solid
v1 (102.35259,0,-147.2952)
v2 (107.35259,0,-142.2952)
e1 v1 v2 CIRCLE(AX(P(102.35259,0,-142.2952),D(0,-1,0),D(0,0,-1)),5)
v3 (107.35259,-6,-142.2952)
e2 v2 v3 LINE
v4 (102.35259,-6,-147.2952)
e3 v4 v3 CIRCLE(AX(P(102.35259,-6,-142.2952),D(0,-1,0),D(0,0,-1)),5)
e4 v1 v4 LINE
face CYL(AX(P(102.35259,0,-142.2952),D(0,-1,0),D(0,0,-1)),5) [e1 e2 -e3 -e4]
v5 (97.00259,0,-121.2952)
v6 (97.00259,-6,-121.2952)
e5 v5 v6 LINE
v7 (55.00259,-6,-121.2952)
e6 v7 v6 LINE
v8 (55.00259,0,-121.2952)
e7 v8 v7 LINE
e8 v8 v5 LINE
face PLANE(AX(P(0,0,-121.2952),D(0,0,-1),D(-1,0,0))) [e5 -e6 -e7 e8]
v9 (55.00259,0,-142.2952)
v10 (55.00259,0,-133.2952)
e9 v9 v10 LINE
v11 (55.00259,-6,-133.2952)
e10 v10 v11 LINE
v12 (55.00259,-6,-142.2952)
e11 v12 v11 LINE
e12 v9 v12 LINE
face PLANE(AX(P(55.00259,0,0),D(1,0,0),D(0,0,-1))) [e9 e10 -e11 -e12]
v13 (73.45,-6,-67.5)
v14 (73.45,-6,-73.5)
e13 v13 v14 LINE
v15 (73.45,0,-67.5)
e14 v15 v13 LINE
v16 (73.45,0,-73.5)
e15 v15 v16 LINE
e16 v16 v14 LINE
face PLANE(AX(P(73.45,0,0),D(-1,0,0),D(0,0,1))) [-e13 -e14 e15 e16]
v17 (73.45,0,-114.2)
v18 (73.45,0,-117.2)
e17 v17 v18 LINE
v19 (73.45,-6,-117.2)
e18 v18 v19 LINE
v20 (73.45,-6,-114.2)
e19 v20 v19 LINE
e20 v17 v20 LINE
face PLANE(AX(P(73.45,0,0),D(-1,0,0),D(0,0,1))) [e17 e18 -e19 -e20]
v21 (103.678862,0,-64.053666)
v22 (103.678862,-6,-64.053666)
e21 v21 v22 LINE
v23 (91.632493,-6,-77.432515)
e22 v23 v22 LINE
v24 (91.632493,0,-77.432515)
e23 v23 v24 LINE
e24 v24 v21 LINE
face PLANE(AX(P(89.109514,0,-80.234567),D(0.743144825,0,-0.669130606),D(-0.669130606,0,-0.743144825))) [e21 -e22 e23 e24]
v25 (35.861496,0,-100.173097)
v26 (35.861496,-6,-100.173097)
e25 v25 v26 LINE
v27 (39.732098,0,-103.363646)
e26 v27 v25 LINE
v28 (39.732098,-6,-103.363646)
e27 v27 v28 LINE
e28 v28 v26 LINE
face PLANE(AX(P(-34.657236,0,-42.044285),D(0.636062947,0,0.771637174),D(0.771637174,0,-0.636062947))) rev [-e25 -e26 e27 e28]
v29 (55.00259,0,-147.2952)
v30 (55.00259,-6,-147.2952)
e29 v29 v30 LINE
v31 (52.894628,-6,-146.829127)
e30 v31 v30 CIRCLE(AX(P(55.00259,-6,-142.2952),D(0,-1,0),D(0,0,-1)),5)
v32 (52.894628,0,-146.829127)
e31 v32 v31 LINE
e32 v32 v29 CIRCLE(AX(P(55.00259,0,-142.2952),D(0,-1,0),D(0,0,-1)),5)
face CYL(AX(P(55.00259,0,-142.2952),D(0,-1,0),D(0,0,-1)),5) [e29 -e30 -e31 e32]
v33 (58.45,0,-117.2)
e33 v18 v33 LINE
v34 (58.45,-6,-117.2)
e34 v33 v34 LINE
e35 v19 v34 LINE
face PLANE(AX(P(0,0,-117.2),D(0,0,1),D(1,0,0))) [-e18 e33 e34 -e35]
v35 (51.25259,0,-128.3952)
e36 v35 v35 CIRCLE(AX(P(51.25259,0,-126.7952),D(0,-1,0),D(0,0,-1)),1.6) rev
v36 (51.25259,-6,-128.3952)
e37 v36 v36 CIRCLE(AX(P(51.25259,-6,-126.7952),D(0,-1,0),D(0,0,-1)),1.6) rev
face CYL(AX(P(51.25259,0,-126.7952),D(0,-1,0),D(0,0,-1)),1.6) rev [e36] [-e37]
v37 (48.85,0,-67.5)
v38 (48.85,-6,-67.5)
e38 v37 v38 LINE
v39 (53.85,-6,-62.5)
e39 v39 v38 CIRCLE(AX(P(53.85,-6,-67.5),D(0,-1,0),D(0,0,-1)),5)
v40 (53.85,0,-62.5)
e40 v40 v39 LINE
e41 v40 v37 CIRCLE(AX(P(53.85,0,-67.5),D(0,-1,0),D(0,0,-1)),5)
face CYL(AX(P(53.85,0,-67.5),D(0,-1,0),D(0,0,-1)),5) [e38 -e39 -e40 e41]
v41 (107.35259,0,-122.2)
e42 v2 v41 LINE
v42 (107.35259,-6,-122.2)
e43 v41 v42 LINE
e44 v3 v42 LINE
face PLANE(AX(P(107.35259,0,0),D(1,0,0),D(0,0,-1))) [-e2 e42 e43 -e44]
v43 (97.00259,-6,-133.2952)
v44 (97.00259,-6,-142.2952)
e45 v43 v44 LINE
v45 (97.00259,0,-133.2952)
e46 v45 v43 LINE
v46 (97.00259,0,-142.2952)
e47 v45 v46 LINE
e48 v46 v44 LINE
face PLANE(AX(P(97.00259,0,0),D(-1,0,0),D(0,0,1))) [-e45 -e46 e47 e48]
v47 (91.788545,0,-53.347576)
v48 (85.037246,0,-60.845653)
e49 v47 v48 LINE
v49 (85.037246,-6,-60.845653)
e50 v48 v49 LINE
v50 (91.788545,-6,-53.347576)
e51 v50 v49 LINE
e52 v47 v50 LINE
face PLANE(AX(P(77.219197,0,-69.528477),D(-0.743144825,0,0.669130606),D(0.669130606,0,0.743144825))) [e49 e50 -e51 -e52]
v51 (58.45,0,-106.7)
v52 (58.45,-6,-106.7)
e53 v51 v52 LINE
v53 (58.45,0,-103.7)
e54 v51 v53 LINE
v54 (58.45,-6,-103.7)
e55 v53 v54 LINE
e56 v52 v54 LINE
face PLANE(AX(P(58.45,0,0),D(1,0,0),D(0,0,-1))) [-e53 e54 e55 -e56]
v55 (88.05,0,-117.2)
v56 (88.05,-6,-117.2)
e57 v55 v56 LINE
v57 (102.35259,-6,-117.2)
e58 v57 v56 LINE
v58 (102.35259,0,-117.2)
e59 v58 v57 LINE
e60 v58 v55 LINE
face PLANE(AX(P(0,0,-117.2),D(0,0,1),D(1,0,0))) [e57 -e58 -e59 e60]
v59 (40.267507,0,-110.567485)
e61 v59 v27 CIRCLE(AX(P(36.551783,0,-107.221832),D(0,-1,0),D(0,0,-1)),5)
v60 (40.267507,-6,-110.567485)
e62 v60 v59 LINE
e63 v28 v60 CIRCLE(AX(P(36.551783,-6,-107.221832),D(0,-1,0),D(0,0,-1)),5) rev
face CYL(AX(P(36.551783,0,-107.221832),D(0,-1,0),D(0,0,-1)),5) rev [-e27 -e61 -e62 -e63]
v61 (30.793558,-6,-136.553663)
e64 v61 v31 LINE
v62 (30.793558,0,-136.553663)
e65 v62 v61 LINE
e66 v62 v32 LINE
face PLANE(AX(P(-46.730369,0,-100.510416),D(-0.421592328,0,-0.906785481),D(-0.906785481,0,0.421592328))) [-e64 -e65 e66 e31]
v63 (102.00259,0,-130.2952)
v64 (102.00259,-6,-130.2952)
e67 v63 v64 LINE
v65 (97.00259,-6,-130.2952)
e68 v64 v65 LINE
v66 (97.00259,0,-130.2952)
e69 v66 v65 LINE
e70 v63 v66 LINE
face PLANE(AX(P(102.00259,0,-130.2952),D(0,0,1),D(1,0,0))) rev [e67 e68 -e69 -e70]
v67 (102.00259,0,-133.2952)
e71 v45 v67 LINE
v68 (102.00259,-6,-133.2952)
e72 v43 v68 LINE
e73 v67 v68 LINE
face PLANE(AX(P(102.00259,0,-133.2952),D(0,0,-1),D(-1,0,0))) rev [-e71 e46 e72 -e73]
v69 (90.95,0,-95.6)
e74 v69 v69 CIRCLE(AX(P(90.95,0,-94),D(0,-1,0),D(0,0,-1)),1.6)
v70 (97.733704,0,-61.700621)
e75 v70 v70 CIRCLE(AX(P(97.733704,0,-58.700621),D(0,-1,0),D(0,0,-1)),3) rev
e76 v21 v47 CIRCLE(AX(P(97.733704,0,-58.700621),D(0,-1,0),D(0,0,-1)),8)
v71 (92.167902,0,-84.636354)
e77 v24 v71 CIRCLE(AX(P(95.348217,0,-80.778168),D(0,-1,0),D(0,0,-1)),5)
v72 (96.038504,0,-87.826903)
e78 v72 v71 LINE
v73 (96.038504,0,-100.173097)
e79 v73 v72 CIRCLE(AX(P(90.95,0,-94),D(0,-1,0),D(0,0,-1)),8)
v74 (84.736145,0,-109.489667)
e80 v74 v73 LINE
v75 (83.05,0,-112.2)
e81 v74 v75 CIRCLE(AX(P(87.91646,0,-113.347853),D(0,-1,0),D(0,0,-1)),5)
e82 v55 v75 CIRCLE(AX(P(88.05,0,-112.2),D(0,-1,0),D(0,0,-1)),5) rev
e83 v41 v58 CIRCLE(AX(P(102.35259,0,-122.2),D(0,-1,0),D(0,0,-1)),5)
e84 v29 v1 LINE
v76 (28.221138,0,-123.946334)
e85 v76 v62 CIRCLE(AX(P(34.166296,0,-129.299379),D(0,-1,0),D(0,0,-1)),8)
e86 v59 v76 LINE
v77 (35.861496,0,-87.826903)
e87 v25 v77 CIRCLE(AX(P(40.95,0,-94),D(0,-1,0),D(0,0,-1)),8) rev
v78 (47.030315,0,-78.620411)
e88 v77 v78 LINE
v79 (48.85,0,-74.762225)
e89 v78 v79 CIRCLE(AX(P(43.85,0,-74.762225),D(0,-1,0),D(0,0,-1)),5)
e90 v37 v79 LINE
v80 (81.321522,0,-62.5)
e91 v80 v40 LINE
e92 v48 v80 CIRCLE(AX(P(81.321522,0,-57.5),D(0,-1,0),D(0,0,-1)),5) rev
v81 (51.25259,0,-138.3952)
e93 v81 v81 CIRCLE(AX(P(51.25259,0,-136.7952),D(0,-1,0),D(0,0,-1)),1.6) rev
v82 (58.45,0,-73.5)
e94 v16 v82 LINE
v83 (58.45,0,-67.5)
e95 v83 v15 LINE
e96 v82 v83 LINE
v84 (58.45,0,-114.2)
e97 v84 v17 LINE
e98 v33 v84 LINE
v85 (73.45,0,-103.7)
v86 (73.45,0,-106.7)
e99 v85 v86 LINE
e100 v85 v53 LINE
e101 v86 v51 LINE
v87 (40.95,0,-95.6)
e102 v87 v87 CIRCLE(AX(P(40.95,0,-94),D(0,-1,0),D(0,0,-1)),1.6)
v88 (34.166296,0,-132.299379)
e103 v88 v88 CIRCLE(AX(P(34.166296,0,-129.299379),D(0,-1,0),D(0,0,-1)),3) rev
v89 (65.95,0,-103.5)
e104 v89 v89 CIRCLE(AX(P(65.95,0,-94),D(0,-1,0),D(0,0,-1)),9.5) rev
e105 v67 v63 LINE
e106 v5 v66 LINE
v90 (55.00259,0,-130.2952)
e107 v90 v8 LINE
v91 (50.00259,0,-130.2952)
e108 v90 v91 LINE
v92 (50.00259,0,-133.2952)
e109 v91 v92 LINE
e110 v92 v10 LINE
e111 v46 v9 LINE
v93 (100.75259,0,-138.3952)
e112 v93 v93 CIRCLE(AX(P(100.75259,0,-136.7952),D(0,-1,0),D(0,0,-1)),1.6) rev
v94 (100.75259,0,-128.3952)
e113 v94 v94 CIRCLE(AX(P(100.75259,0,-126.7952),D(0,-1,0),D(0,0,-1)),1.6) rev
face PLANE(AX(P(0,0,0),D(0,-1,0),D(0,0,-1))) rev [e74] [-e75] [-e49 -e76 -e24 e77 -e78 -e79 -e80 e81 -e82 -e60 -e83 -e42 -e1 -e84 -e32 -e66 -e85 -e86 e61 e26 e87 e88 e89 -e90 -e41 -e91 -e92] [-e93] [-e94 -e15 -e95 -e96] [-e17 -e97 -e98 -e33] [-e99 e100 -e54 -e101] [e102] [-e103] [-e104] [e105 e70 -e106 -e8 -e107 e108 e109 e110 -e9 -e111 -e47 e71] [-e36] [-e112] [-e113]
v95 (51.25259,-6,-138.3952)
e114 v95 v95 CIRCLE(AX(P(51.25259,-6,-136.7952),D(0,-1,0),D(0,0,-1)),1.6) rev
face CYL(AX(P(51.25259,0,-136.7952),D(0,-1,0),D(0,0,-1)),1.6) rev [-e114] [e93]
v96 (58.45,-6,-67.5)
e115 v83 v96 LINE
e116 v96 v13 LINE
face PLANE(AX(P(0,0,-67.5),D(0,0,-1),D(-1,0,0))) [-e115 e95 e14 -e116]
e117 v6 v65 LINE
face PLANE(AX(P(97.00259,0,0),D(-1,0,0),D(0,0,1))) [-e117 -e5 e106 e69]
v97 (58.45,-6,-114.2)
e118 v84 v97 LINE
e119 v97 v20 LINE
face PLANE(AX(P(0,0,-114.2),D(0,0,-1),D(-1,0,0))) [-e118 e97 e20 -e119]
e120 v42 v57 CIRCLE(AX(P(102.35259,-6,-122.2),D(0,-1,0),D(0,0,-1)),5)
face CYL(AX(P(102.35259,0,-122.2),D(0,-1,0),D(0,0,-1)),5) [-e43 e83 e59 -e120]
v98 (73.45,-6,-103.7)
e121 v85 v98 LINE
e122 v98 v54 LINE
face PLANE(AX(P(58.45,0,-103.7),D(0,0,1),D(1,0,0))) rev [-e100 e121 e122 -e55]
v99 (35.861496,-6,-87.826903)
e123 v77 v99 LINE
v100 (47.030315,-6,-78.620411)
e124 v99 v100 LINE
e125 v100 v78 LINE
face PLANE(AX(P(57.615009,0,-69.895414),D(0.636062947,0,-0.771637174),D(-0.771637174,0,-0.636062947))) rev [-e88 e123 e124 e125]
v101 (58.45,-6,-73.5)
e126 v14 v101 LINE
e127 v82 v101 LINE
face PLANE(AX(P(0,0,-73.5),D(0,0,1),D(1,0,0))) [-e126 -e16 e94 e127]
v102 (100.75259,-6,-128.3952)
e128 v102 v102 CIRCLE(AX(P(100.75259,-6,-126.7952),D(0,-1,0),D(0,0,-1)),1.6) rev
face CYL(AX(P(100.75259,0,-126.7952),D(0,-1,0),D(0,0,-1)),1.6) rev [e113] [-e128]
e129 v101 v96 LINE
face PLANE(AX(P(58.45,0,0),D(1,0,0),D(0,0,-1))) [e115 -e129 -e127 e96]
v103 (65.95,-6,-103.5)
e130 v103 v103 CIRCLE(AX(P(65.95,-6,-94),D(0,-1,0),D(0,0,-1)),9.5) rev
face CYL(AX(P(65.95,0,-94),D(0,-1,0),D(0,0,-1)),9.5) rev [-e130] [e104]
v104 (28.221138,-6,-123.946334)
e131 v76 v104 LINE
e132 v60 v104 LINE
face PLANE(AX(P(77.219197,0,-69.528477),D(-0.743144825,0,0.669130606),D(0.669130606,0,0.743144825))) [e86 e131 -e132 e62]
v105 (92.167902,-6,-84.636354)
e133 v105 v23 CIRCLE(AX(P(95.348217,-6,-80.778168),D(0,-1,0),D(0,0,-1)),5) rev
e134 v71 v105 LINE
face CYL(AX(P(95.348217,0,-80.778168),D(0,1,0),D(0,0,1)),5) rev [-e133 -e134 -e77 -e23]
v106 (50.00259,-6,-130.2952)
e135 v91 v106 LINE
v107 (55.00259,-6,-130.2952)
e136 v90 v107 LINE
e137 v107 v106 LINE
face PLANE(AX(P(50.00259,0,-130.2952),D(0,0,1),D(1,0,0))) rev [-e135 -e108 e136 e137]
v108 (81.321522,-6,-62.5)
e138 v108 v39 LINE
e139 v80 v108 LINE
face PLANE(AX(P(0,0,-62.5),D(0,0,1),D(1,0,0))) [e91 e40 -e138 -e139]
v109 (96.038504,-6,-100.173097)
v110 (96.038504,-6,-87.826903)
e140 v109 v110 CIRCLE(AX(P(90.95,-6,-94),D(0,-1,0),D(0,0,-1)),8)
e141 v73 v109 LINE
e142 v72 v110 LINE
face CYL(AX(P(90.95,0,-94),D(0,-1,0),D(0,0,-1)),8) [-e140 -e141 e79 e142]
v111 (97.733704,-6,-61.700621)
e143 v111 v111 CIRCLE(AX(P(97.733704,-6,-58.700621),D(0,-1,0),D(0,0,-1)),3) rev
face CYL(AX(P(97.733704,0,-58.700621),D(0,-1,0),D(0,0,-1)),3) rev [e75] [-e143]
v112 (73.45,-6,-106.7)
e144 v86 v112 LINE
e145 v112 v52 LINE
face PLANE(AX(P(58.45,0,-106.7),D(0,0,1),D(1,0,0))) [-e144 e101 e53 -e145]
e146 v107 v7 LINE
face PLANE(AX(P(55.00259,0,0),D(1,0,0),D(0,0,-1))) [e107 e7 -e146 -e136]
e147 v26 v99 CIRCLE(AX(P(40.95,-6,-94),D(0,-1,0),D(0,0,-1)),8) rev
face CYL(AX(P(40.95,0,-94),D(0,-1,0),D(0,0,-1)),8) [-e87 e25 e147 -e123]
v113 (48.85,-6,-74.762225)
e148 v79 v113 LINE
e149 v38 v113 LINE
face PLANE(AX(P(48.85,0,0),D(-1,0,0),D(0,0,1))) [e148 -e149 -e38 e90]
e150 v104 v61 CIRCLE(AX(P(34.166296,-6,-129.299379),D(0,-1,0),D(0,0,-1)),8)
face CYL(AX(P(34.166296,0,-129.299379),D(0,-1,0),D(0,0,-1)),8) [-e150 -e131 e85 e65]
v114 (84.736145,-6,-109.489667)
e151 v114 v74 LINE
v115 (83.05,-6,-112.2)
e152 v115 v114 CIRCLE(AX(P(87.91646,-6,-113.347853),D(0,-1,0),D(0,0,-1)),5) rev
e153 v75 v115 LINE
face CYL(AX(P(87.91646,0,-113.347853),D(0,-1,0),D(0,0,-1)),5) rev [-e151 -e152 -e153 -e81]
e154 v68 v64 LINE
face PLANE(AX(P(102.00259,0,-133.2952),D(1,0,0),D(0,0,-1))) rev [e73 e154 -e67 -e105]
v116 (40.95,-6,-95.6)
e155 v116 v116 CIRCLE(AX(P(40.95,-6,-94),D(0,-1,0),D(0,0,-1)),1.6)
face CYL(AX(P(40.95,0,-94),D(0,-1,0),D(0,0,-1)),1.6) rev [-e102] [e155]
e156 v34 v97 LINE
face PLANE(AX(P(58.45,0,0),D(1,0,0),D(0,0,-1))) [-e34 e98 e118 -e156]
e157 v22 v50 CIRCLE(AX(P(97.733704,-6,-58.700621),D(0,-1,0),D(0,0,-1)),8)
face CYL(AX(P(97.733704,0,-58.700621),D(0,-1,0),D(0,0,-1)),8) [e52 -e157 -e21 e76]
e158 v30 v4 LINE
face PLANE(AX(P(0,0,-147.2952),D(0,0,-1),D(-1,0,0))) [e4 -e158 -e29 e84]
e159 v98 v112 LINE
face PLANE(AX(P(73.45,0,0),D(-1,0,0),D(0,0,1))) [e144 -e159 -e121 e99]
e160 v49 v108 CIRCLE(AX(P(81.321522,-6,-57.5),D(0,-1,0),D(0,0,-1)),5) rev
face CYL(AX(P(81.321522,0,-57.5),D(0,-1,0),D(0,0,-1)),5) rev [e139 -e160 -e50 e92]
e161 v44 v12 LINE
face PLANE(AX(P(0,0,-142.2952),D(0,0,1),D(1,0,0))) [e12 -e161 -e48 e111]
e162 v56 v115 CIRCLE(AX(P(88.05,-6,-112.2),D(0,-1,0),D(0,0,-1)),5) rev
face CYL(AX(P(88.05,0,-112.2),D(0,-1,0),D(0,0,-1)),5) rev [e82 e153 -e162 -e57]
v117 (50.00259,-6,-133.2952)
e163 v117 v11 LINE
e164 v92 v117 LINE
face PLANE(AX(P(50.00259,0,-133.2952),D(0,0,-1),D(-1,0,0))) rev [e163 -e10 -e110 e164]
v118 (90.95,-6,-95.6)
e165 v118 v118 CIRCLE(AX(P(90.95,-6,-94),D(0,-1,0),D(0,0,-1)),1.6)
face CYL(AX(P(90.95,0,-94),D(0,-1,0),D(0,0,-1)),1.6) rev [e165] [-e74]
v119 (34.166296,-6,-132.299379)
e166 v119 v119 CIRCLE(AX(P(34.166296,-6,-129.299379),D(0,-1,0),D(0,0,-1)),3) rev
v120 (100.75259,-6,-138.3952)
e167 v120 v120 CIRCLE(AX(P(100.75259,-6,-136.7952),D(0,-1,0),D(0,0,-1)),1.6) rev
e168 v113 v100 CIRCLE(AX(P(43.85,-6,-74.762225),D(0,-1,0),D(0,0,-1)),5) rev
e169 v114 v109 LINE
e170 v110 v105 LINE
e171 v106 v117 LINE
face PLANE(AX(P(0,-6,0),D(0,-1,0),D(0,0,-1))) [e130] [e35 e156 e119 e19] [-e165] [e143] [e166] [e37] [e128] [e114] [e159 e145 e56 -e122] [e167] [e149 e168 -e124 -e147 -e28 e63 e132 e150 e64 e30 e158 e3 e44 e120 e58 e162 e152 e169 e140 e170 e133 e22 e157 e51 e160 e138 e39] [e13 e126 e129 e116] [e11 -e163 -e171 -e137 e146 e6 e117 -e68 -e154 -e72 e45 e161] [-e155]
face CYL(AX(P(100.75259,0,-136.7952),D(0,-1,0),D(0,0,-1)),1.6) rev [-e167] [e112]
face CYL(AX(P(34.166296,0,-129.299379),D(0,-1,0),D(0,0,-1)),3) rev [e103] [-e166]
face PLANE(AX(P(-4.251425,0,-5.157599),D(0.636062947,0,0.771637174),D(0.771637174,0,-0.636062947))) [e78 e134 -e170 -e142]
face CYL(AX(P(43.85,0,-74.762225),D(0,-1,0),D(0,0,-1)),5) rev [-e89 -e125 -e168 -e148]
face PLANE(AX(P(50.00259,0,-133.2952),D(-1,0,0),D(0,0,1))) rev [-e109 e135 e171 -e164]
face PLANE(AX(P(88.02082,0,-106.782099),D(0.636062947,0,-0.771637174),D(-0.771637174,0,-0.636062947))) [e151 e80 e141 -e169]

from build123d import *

# Parameters (mm, degrees)
ESBO_O1_R                = 3
ESBO_O1_R_2              = 1.6
ESBO_O1_W                = 15
ESBO_O1_H                = 3
ESBO_O1_W_2              = 42
ESBO_O1_H_2              = 21
ESBO_O1_R_3              = 9.5
ESBO_O1_H_3              = 6
RESSALTO_EXTRUS_O1_DEPTH = 6
FILETE1_R                = 5
ESBO_O2_W                = 15
ESBO_O2_H                = 1.3
ESBO_O2_W_2              = 5
ESBO_O2_H_2              = 3
CORTE_EXTRUS_O1_DEPTH    = 183.363523005
ESBO_O3_W                = 15
ESBO_O3_H                = 1.3
RESSALTO_EXTRUS_O2_DEPTH = 6


with BuildPart() as part:
    # Esboço1 → Ressalto-extrusão1 (new body)
    with BuildSketch(Plane.XZ.offset(6)):
        with BuildLine():
            ThreePointArc((28.221137594, -123.946334359), (26.32780231, -130.898758331), (30.793557575, -136.55366306))
            Line((30.793557575, -136.55366306), (52.89462836, -146.829127406))
            ThreePointArc((52.89462836, -146.829127406), (53.923154275, -147.177291613), (55.00259, -147.2952))
            Line((55.00259, -147.2952), (102.35259, -147.2952))
            ThreePointArc((102.35259, -147.2952), (105.888123906, -145.830733906), (107.35259, -142.2952))
            Line((107.35259, -142.2952), (107.35259, -122.2))
            ThreePointArc((107.35259, -122.2), (105.888123906, -118.664466094), (102.35259, -117.2))
            Line((102.35259, -117.2), (88.05, -117.2))
            ThreePointArc((88.05, -117.2), (84.514466094, -115.735533906), (83.05, -112.2))
            Line((83.05, -112.2), (83.05, -110.8795617))
            Line((83.05, -110.8795617), (96.038503575, -100.173097388))
            ThreePointArc((96.038503575, -100.173097388), (98.95, -94), (96.038503575, -87.826902612))
            Line((96.038503575, -87.826902612), (88.137508625, -81.314087647))
            Line((88.137508625, -81.314087647), (103.678862406, -64.053665641))
            ThreePointArc((103.678862406, -64.053665641), (103.086748653, -52.755462186), (91.788545198, -53.347575939))
            Line((91.788545198, -53.347575939), (85.037246259, -60.845653032))
            ThreePointArc((85.037246259, -60.845653032), (83.355205347, -62.067727288), (81.321522132, -62.5))
            Line((81.321522132, -62.5), (53.85, -62.5))
            ThreePointArc((53.85, -62.5), (50.314466094, -63.964466094), (48.85, -67.5))
            Line((48.85, -67.5), (48.85, -77.1204383))
            Line((48.85, -77.1204383), (35.861496425, -87.826902612))
            ThreePointArc((35.861496425, -87.826902612), (32.95, -94), (35.861496425, -100.173097388))
            Line((35.861496425, -100.173097388), (43.762491375, -106.685912353))
            Line((43.762491375, -106.685912353), (28.221137594, -123.946334359))
        make_face()
        with Locations(Location((34.166296198, -129.29937921, 0), (0, 0, 270))):
            Circle(ESBO_O1_R, mode=Mode.SUBTRACT)
        with Locations(Location((51.25259, -136.7952, 0), (0, 0, 270))):
            Circle(ESBO_O1_R_2, mode=Mode.SUBTRACT)
        with Locations(Location((51.25259, -126.7952, 0), (0, 0, 270))):
            Circle(ESBO_O1_R_2, mode=Mode.SUBTRACT)
        with Locations((65.95, -115.7)):
            Rectangle(ESBO_O1_W, ESBO_O1_H, mode=Mode.SUBTRACT)
        with Locations((65.95, -106.5)):
            Rectangle(ESBO_O1_W, ESBO_O1_H, mode=Mode.SUBTRACT)
        with Locations((76.00259, -131.7952)):
            Rectangle(ESBO_O1_W_2, ESBO_O1_H_2, mode=Mode.SUBTRACT)
        with Locations(Location((100.75259, -136.7952, 0), (0, 0, 270))):
            Circle(ESBO_O1_R_2, mode=Mode.SUBTRACT)
        with Locations(Location((100.75259, -126.7952, 0), (0, 0, 270))):
            Circle(ESBO_O1_R_2, mode=Mode.SUBTRACT)
        with Locations(Location((65.95, -94, 0), (0, 0, 270))):
            Circle(ESBO_O1_R_3, mode=Mode.SUBTRACT)
        with Locations((65.95, -70.5)):
            Rectangle(ESBO_O1_W, ESBO_O1_H_3, mode=Mode.SUBTRACT)
        with Locations(Location((97.733703802, -58.70062079, 0), (0, 0, 270))):
            Circle(ESBO_O1_R, mode=Mode.SUBTRACT)
        with Locations(Location((40.95, -94, 0), (0, 0, 270))):
            Circle(ESBO_O1_R_2, mode=Mode.SUBTRACT)
        with Locations(Location((90.95, -94, 0), (0, 0, 270))):
            Circle(ESBO_O1_R_2, mode=Mode.SUBTRACT)
    extrude(amount=-RESSALTO_EXTRUS_O1_DEPTH)

    # Filete1
    # the kernel refuses this fillet: 5 mm, written as the material it adds along each edge
    with BuildSketch(Plane(origin=(83.05, -6, -110.8795617), x_dir=(0, 0, -1), z_dir=(0, 1, 0))) as filete1_piece_1:
        with BuildLine():
            CenterArc((2.468290902, -4.866460151), FILETE1_R, 103.271787815, 37.229346276)
            Line((-1.389894966, -1.686145417), (-1.467058683, -1.622539122))
            Line((-1.467058683, -1.622539122), (-0.077163717, 0.063606295))
            Line((-0.077163717, 0.063606295), (0, 0.1))
            ThreePointArc((0, 0.1), (0.66021915, 0.1), (1.297481248, 0.097329203))
            Line((1.297481248, 0.097329203), (1.3204383, 0))
        make_face()
    extrude(amount=6)
    with BuildSketch(Plane(origin=(88.137508625, -6, -81.314087647), x_dir=(0.7716371735307594, 0, -0.6360629469049904), z_dir=(0, 1, 0))) as filete1_piece_2:
        with BuildLine():
            CenterArc((FILETE1_R * 1.04463432468, -FILETE1_R), FILETE1_R, 90, 92.501134091)
            Line((FILETE1_R * 0.045586966675, -FILETE1_R * 1.04363916214), (FILETE1_R * 0.025606019515, -FILETE1_R * 1.04451194539))
            Line((FILETE1_R * 0.025606019515, -FILETE1_R * 1.04451194539), (-FILETE1_R * 0.0208926864935, FILETE1_R * 0.02))
            Line((-FILETE1_R * 0.0208926864935, FILETE1_R * 0.02), (FILETE1_R * 1.04463432468, FILETE1_R * 0.02))
            Line((FILETE1_R * 1.04463432468, FILETE1_R * 0.02), (FILETE1_R * 1.04463432468, 0))
        make_face()
    extrude(amount=6)
    with BuildSketch(Plane(origin=(48.85, -6, -77.1204383), x_dir=(0, 0, 1), z_dir=(0, 1, 0))) as filete1_piece_3:
        with BuildLine():
            CenterArc((FILETE1_R * 0.471642717043, -FILETE1_R), FILETE1_R, 90, 50.501134091)
            Line((-FILETE1_R * 0.299994456488, -FILETE1_R * 0.363937053095), (-FILETE1_R * 0.315427199959, -FILETE1_R * 0.351215794157))
            Line((-FILETE1_R * 0.315427199959, -FILETE1_R * 0.351215794157), (-FILETE1_R * 0.00943285434085, FILETE1_R * 0.02))
            Line((-FILETE1_R * 0.00943285434085, FILETE1_R * 0.02), (FILETE1_R * 0.471642717043, FILETE1_R * 0.02))
            Line((FILETE1_R * 0.471642717043, FILETE1_R * 0.02), (FILETE1_R * 0.471642717043, 0))
        make_face()
    extrude(amount=6)
    with BuildSketch(Plane(origin=(43.762491375, -6, -106.685912353), x_dir=(-0.6691306063588565, 0, -0.7431448254773958), z_dir=(0, 1, 0))) as filete1_piece_4:
        with BuildLine():
            CenterArc((FILETE1_R * 1.04463432468, FILETE1_R), FILETE1_R, 177.498865909, 92.501134091)
            Line((FILETE1_R * 0.0455869666753, FILETE1_R * 1.04363916214), (FILETE1_R * 0.0256060195153, FILETE1_R * 1.04451194539))
            Line((FILETE1_R * 0.0256060195153, FILETE1_R * 1.04451194539), (-FILETE1_R * 0.0208926864935, -FILETE1_R * 0.02))
            Line((-FILETE1_R * 0.0208926864935, -FILETE1_R * 0.02), (FILETE1_R * 1.04463432468, -FILETE1_R * 0.02))
            Line((FILETE1_R * 1.04463432468, -FILETE1_R * 0.02), (FILETE1_R * 1.04463432468, 0))
        make_face()
    extrude(amount=6)

    # Esboço2 → Corte-extrusão1 (cut, through all)
    with BuildSketch(Plane.XZ.offset(6)):
        with Locations((65.95, -104.35)):
            Rectangle(ESBO_O2_W, ESBO_O2_H)
        with Locations((52.50259, -131.7952)):
            Rectangle(ESBO_O2_W_2, ESBO_O2_H_2)
        with Locations((99.50259, -131.7952)):
            Rectangle(ESBO_O2_W_2, ESBO_O2_H_2)
    extrude(amount=-CORTE_EXTRUS_O1_DEPTH, mode=Mode.SUBTRACT)

    # Esboço3 → Ressalto-extrusão2 (add)
    with BuildSketch(Plane.XZ.offset(6)):
        with Locations((65.95, -107.35)):
            Rectangle(ESBO_O3_W, ESBO_O3_H)
    extrude(amount=-RESSALTO_EXTRUS_O2_DEPTH)


solid = part.part
